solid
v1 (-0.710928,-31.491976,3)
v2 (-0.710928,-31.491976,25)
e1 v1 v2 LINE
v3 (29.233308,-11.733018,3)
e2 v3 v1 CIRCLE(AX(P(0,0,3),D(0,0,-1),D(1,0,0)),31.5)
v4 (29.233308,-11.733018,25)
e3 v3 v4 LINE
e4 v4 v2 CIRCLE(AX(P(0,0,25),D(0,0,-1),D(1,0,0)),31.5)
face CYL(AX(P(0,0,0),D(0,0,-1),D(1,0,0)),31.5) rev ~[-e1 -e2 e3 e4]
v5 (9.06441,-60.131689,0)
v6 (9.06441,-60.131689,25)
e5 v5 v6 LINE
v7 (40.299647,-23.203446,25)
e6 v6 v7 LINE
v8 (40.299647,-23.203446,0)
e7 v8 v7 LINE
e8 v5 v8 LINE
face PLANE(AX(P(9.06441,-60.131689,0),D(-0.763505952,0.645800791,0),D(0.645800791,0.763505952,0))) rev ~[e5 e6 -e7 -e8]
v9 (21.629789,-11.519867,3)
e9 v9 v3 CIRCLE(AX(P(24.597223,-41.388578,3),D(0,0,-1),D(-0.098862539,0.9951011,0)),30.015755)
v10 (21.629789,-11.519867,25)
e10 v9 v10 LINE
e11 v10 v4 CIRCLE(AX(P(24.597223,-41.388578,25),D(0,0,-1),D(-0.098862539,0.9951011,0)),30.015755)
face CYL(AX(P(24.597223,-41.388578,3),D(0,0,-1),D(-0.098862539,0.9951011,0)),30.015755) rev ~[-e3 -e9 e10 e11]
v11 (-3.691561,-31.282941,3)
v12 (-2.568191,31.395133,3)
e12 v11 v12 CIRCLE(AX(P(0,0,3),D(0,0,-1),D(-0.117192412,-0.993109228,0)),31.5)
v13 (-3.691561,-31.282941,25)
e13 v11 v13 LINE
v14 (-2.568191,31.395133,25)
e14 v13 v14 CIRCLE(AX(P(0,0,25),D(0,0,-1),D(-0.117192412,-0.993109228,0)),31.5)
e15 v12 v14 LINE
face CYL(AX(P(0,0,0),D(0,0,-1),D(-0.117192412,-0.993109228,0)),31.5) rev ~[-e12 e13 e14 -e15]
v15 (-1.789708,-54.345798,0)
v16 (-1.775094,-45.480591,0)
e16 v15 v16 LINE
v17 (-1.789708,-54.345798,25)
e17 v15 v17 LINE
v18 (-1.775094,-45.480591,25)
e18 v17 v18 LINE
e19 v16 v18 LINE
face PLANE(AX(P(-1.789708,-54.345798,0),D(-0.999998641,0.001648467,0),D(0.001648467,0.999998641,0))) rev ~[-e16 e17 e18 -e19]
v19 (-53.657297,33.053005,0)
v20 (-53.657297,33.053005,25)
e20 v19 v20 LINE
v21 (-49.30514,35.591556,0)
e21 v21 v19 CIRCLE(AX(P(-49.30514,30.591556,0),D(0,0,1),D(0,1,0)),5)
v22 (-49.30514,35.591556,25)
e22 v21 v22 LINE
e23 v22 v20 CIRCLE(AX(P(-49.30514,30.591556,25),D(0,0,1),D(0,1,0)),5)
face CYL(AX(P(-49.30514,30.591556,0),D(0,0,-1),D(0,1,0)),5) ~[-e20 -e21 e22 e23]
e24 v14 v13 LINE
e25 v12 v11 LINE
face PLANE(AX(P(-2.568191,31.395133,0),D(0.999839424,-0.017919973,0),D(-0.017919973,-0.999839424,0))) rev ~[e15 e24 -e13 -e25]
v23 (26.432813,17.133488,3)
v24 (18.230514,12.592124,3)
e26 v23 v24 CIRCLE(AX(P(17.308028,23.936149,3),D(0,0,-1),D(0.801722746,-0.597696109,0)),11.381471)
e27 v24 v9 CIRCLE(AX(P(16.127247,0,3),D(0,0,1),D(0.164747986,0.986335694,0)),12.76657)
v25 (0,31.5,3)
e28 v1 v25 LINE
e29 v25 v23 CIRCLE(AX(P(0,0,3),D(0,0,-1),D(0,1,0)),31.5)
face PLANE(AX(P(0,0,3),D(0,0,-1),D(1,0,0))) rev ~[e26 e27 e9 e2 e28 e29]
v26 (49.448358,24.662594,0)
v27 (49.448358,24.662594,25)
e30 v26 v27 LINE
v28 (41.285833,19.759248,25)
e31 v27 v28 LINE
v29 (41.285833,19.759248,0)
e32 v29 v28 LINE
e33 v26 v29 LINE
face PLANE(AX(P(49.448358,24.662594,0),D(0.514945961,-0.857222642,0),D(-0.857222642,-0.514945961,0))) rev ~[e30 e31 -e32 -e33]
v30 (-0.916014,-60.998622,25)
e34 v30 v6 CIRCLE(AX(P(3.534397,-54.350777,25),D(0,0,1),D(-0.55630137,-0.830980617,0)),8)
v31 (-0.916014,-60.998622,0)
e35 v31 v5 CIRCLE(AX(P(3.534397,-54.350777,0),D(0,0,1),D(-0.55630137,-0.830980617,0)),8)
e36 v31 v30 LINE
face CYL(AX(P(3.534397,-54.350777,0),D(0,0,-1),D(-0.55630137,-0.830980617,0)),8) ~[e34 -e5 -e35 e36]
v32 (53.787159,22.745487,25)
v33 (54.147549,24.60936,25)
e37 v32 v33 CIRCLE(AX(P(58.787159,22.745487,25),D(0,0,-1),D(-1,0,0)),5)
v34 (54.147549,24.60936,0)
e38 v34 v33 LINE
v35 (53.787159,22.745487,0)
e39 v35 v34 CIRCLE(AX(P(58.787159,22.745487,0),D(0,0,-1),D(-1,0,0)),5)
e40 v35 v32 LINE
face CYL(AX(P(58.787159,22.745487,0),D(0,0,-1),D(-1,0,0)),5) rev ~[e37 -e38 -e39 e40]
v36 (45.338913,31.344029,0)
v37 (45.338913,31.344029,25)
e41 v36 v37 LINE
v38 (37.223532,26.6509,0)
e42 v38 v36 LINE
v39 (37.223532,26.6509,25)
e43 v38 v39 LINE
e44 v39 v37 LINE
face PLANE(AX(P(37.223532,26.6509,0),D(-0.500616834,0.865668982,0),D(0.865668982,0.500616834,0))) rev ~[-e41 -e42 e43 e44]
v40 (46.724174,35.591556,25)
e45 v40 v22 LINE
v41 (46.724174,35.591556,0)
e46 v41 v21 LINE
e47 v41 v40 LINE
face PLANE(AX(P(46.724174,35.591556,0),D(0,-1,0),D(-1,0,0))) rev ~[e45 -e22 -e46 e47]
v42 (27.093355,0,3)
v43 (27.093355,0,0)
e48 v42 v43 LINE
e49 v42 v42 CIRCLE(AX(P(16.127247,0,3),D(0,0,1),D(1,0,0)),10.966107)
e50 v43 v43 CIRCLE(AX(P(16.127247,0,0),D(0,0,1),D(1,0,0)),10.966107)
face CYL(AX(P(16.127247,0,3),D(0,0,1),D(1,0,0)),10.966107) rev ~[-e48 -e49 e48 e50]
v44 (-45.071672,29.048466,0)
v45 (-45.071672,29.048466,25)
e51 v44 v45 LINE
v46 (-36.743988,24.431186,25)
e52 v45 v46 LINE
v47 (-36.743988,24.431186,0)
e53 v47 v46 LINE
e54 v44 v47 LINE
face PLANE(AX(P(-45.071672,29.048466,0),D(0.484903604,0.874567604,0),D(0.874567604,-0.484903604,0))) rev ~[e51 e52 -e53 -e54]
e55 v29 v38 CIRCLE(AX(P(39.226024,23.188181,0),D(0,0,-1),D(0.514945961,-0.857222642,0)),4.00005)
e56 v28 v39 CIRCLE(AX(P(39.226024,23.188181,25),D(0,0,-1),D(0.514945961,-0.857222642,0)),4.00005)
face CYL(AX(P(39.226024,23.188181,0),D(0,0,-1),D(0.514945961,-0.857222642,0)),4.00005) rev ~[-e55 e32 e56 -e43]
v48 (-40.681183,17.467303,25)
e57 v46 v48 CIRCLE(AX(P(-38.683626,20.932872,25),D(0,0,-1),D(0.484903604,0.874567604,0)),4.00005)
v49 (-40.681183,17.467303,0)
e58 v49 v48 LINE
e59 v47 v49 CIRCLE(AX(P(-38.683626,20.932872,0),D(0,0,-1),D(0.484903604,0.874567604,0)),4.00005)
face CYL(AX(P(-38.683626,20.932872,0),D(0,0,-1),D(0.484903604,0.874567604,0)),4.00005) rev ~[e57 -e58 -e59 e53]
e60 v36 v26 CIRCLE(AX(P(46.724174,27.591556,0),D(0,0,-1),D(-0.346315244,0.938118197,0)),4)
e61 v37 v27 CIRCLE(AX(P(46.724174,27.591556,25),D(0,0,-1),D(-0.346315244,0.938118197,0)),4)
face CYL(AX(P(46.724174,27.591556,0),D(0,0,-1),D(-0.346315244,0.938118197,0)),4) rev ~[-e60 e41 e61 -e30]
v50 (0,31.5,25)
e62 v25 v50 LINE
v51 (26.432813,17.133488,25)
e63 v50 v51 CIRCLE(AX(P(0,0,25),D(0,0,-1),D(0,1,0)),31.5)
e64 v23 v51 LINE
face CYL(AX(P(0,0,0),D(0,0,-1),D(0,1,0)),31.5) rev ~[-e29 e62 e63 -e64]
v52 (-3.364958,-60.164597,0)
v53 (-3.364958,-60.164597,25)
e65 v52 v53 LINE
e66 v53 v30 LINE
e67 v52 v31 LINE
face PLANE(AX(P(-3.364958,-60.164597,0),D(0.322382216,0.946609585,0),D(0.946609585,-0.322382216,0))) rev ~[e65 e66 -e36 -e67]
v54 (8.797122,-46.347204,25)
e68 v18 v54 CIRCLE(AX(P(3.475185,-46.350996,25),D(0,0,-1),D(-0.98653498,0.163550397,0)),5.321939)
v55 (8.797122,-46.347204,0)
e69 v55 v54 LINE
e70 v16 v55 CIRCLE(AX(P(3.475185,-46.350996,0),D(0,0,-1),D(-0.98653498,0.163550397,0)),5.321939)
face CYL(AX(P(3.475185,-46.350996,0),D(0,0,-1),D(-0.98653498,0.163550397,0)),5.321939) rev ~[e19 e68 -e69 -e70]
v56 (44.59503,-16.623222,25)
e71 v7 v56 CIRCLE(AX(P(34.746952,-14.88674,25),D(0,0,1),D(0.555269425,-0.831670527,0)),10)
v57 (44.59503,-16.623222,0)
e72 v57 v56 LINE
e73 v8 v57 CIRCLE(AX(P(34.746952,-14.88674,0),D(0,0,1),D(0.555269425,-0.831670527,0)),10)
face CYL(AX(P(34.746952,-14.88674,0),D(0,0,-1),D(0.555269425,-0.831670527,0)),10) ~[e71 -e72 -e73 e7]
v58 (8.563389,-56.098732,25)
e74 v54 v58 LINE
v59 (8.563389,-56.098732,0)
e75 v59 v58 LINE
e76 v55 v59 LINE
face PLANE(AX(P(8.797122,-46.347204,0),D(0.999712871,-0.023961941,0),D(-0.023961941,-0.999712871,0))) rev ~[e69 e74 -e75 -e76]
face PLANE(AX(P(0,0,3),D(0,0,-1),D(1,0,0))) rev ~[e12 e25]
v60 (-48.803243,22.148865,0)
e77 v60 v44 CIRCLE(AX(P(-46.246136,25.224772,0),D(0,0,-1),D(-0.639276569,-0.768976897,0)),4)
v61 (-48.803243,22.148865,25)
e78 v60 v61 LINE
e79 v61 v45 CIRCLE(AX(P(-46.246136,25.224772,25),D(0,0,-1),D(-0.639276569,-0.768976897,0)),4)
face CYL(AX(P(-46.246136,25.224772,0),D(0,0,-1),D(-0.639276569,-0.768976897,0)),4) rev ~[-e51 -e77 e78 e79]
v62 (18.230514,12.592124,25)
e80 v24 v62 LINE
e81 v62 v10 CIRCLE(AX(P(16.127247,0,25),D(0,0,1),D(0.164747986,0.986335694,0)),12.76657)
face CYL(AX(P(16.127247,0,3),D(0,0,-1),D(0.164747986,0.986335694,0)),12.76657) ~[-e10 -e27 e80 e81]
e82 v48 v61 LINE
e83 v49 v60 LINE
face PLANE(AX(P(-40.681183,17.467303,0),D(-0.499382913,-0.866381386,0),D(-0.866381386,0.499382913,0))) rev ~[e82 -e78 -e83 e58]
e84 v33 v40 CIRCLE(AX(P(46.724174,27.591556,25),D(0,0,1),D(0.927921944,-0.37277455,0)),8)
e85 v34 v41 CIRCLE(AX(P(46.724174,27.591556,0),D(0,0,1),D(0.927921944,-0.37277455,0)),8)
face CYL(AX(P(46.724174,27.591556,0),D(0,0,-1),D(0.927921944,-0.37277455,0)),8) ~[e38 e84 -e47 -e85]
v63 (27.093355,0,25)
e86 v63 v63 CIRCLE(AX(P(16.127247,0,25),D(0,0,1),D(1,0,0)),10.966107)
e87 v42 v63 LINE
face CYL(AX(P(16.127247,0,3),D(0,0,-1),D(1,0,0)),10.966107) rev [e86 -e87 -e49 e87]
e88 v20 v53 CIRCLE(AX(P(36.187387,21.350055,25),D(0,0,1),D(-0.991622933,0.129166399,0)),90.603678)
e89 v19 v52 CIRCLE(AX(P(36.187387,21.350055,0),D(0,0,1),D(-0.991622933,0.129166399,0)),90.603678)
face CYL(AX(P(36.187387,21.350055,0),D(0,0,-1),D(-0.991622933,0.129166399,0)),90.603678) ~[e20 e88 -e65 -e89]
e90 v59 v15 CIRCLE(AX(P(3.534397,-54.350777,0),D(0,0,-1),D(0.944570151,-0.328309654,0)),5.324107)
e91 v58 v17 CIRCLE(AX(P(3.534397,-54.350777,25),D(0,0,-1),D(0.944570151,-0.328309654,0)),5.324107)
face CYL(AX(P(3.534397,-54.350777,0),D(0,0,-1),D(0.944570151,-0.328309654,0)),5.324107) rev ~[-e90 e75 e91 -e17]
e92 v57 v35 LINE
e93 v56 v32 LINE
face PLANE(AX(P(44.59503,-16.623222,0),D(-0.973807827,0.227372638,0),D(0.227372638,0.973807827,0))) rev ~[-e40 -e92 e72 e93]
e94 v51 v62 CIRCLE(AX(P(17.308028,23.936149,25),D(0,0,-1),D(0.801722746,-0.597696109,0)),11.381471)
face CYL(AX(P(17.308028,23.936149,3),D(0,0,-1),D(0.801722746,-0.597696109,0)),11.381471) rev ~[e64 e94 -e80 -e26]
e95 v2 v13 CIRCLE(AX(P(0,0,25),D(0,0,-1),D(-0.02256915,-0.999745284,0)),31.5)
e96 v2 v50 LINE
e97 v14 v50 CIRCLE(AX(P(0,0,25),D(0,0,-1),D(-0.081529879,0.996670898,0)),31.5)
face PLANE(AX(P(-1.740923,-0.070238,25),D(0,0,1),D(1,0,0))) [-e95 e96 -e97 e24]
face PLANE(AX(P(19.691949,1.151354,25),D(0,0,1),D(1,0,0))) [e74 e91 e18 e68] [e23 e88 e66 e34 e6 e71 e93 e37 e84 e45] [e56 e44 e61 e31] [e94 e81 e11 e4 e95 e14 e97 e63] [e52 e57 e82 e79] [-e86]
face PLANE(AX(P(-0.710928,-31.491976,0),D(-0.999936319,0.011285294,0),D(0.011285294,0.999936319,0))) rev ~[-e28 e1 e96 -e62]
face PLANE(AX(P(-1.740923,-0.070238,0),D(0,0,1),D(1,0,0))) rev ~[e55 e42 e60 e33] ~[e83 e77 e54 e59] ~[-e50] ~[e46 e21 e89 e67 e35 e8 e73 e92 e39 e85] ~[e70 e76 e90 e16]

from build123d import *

# Parameters (mm, degrees)
F1_DEPTH = 25
F2_R     = 33.4969963506
F2_R_2   = 31.5
F3_DEPTH = 3
F4_R     = 10.9661073878
F5_DEPTH = 25
F6_DEPTH = 22
F7_DEPTH = 25


with BuildPart() as f1:
    # F0 (on Top) → F1 (new body)
    with BuildSketch(Plane.XY):
        with BuildLine():
            ThreePointArc((53.7871589783, 22.7454871565), (53.8780832708, 23.694684553), (54.1475492573, 24.6093599089))
            ThreePointArc((54.1475492573, 24.6093599089), (53.3520531244, 32.0716472029), (46.7241737037, 35.5915563126))
            Line((46.7241737037, 35.5915563126), (-49.3051404481, 35.5915563126))
            ThreePointArc((-49.3051404481, 35.5915563126), (-51.824342213, 34.910540275), (-53.6572972564, 33.0530052997))
            ThreePointArc((-53.6572972564, 33.0530052997), (-43.5514249028, -21.6702688765), (-3.3649580648, -60.1645967141))
            Line((-3.3649580648, -60.1645967141), (-0.9160143624, -60.9986215442))
            ThreePointArc((-0.9160143624, -60.9986215442), (4.2266959979, -62.32076541), (9.0644102401, -60.1316890835))
            Line((9.0644102401, -60.1316890835), (40.2996465564, -23.2034455985))
            ThreePointArc((40.2996465564, -23.2034455985), (43.1207673401, -20.3529292947), (44.5950298413, -16.6232221009))
            Line((44.5950298413, -16.6232221009), (53.7871589783, 22.7454871565))
        make_face()
        with BuildLine():
            ThreePointArc((8.563389259, -56.098732374), (2.6455954518, -59.6001717259), (-1.7897081955, -54.3457980587))
            Line((-1.7897081955, -54.3457980587), (-1.775094173, -45.4805905471))
            ThreePointArc((-1.775094173, -45.4805905471), (3.9099702523, -41.0468470679), (8.7971219068, -46.3472043639))
            Line((8.7971219068, -46.3472043639), (8.563389259, -56.098732374))
        make_face(mode=Mode.SUBTRACT)
        with BuildLine():
            ThreePointArc((0, 31.5), (22.2738636074, 22.2738636074), (31.5, 0))
            ThreePointArc((31.5, 0), (22.0210780969, -22.5238122762), (-0.7109282192, -31.4919764554))
            ThreePointArc((-0.7109282192, -31.4919764554), (-2.2037245281, -31.4228197049), (-3.6915609888, -31.282940678))
            ThreePointArc((-3.6915609888, -31.282940678), (-31.4949418681, 0.5644791617), (-2.5681911856, 31.3951332858))
            ThreePointArc((-2.5681911856, 31.3951332858), (-1.2851656502, 31.4737724026), (0, 31.5))
        make_face(mode=Mode.SUBTRACT)
        with BuildLine():
            ThreePointArc((-48.8032426669, 22.148864889), (-49.7645237359, 27.1276520058), (-45.0716722429, 29.0484662373))
            Line((-45.0716722429, 29.0484662373), (-36.743987983, 24.4311855453))
            ThreePointArc((-36.743987983, 24.4311855453), (-35.2015648727, 18.9642062238), (-40.6811828695, 17.4673032339))
            Line((-40.6811828695, 17.4673032339), (-48.8032426669, 22.148864889))
        make_face(mode=Mode.SUBTRACT)
        with BuildLine():
            ThreePointArc((41.2858330553, 19.7592478666), (35.7800785258, 21.1569599304), (37.223531508, 26.6508998136))
            Line((37.223531508, 26.6508998136), (45.3389127294, 31.3440291017))
            ThreePointArc((45.3389127294, 31.3440291017), (50.131309387, 29.6871293693), (49.448357561, 24.6625936444))
            Line((49.448357561, 24.6625936444), (41.2858330553, 19.7592478666))
        make_face(mode=Mode.SUBTRACT)
    extrude(amount=F1_DEPTH)

    # F2 (on face) → F3 (join)
    with BuildSketch(Plane(origin=(0, 0, 0), x_dir=(1, 0, 0), z_dir=(0, 0, -1))):
        Circle(F2_R)
        Circle(F2_R_2, mode=Mode.SUBTRACT)
        Circle(F2_R_2)
    extrude(amount=-F3_DEPTH)

    # F4 (on face) → F5 (cut)
    with BuildSketch(Plane.XY.offset(3)):
        with Locations((16.1272473633, 0)):
            Circle(F4_R)
    extrude(amount=-F5_DEPTH, mode=Mode.SUBTRACT)

    # F4 (on face) → F6 (join)
    with BuildSketch(Plane.XY.offset(3)):
        with BuildLine():
            ThreePointArc((26.4328128914, 17.1334877549), (22.8210045885, 13.9789914635), (18.2305140411, 12.5921235522))
            ThreePointArc((18.2305140411, 12.5921235522), (3.48568477, -1.7821900775), (21.6297892683, -11.5198671371))
            ThreePointArc((21.6297892683, -11.5198671371), (25.4383279787, -11.3846100228), (29.2333080601, -11.7330175088))
            ThreePointArc((29.2333080601, -11.7330175088), (32.5859089375, 3.1613345542), (26.4328128914, 17.1334877549))
        make_face()
        with Locations((16.1272473633, 0)):
            Circle(F4_R, mode=Mode.SUBTRACT)
    extrude(amount=F6_DEPTH)

    # F0 (on Top) → F7 (join)
    with BuildSketch(Plane.XY):
        with BuildLine():
            Line((-0.7109282192, -31.4919764554), (0, 31.5))
            ThreePointArc((0, 31.5), (-1.2851656502, 31.4737724026), (-2.5681911856, 31.3951332858))
            Line((-2.5681911856, 31.3951332858), (-3.6915609888, -31.282940678))
            ThreePointArc((-3.6915609888, -31.282940678), (-2.2037245281, -31.4228197049), (-0.7109282192, -31.4919764554))
        make_face()
    extrude(amount=F7_DEPTH)


solid = f1.part
